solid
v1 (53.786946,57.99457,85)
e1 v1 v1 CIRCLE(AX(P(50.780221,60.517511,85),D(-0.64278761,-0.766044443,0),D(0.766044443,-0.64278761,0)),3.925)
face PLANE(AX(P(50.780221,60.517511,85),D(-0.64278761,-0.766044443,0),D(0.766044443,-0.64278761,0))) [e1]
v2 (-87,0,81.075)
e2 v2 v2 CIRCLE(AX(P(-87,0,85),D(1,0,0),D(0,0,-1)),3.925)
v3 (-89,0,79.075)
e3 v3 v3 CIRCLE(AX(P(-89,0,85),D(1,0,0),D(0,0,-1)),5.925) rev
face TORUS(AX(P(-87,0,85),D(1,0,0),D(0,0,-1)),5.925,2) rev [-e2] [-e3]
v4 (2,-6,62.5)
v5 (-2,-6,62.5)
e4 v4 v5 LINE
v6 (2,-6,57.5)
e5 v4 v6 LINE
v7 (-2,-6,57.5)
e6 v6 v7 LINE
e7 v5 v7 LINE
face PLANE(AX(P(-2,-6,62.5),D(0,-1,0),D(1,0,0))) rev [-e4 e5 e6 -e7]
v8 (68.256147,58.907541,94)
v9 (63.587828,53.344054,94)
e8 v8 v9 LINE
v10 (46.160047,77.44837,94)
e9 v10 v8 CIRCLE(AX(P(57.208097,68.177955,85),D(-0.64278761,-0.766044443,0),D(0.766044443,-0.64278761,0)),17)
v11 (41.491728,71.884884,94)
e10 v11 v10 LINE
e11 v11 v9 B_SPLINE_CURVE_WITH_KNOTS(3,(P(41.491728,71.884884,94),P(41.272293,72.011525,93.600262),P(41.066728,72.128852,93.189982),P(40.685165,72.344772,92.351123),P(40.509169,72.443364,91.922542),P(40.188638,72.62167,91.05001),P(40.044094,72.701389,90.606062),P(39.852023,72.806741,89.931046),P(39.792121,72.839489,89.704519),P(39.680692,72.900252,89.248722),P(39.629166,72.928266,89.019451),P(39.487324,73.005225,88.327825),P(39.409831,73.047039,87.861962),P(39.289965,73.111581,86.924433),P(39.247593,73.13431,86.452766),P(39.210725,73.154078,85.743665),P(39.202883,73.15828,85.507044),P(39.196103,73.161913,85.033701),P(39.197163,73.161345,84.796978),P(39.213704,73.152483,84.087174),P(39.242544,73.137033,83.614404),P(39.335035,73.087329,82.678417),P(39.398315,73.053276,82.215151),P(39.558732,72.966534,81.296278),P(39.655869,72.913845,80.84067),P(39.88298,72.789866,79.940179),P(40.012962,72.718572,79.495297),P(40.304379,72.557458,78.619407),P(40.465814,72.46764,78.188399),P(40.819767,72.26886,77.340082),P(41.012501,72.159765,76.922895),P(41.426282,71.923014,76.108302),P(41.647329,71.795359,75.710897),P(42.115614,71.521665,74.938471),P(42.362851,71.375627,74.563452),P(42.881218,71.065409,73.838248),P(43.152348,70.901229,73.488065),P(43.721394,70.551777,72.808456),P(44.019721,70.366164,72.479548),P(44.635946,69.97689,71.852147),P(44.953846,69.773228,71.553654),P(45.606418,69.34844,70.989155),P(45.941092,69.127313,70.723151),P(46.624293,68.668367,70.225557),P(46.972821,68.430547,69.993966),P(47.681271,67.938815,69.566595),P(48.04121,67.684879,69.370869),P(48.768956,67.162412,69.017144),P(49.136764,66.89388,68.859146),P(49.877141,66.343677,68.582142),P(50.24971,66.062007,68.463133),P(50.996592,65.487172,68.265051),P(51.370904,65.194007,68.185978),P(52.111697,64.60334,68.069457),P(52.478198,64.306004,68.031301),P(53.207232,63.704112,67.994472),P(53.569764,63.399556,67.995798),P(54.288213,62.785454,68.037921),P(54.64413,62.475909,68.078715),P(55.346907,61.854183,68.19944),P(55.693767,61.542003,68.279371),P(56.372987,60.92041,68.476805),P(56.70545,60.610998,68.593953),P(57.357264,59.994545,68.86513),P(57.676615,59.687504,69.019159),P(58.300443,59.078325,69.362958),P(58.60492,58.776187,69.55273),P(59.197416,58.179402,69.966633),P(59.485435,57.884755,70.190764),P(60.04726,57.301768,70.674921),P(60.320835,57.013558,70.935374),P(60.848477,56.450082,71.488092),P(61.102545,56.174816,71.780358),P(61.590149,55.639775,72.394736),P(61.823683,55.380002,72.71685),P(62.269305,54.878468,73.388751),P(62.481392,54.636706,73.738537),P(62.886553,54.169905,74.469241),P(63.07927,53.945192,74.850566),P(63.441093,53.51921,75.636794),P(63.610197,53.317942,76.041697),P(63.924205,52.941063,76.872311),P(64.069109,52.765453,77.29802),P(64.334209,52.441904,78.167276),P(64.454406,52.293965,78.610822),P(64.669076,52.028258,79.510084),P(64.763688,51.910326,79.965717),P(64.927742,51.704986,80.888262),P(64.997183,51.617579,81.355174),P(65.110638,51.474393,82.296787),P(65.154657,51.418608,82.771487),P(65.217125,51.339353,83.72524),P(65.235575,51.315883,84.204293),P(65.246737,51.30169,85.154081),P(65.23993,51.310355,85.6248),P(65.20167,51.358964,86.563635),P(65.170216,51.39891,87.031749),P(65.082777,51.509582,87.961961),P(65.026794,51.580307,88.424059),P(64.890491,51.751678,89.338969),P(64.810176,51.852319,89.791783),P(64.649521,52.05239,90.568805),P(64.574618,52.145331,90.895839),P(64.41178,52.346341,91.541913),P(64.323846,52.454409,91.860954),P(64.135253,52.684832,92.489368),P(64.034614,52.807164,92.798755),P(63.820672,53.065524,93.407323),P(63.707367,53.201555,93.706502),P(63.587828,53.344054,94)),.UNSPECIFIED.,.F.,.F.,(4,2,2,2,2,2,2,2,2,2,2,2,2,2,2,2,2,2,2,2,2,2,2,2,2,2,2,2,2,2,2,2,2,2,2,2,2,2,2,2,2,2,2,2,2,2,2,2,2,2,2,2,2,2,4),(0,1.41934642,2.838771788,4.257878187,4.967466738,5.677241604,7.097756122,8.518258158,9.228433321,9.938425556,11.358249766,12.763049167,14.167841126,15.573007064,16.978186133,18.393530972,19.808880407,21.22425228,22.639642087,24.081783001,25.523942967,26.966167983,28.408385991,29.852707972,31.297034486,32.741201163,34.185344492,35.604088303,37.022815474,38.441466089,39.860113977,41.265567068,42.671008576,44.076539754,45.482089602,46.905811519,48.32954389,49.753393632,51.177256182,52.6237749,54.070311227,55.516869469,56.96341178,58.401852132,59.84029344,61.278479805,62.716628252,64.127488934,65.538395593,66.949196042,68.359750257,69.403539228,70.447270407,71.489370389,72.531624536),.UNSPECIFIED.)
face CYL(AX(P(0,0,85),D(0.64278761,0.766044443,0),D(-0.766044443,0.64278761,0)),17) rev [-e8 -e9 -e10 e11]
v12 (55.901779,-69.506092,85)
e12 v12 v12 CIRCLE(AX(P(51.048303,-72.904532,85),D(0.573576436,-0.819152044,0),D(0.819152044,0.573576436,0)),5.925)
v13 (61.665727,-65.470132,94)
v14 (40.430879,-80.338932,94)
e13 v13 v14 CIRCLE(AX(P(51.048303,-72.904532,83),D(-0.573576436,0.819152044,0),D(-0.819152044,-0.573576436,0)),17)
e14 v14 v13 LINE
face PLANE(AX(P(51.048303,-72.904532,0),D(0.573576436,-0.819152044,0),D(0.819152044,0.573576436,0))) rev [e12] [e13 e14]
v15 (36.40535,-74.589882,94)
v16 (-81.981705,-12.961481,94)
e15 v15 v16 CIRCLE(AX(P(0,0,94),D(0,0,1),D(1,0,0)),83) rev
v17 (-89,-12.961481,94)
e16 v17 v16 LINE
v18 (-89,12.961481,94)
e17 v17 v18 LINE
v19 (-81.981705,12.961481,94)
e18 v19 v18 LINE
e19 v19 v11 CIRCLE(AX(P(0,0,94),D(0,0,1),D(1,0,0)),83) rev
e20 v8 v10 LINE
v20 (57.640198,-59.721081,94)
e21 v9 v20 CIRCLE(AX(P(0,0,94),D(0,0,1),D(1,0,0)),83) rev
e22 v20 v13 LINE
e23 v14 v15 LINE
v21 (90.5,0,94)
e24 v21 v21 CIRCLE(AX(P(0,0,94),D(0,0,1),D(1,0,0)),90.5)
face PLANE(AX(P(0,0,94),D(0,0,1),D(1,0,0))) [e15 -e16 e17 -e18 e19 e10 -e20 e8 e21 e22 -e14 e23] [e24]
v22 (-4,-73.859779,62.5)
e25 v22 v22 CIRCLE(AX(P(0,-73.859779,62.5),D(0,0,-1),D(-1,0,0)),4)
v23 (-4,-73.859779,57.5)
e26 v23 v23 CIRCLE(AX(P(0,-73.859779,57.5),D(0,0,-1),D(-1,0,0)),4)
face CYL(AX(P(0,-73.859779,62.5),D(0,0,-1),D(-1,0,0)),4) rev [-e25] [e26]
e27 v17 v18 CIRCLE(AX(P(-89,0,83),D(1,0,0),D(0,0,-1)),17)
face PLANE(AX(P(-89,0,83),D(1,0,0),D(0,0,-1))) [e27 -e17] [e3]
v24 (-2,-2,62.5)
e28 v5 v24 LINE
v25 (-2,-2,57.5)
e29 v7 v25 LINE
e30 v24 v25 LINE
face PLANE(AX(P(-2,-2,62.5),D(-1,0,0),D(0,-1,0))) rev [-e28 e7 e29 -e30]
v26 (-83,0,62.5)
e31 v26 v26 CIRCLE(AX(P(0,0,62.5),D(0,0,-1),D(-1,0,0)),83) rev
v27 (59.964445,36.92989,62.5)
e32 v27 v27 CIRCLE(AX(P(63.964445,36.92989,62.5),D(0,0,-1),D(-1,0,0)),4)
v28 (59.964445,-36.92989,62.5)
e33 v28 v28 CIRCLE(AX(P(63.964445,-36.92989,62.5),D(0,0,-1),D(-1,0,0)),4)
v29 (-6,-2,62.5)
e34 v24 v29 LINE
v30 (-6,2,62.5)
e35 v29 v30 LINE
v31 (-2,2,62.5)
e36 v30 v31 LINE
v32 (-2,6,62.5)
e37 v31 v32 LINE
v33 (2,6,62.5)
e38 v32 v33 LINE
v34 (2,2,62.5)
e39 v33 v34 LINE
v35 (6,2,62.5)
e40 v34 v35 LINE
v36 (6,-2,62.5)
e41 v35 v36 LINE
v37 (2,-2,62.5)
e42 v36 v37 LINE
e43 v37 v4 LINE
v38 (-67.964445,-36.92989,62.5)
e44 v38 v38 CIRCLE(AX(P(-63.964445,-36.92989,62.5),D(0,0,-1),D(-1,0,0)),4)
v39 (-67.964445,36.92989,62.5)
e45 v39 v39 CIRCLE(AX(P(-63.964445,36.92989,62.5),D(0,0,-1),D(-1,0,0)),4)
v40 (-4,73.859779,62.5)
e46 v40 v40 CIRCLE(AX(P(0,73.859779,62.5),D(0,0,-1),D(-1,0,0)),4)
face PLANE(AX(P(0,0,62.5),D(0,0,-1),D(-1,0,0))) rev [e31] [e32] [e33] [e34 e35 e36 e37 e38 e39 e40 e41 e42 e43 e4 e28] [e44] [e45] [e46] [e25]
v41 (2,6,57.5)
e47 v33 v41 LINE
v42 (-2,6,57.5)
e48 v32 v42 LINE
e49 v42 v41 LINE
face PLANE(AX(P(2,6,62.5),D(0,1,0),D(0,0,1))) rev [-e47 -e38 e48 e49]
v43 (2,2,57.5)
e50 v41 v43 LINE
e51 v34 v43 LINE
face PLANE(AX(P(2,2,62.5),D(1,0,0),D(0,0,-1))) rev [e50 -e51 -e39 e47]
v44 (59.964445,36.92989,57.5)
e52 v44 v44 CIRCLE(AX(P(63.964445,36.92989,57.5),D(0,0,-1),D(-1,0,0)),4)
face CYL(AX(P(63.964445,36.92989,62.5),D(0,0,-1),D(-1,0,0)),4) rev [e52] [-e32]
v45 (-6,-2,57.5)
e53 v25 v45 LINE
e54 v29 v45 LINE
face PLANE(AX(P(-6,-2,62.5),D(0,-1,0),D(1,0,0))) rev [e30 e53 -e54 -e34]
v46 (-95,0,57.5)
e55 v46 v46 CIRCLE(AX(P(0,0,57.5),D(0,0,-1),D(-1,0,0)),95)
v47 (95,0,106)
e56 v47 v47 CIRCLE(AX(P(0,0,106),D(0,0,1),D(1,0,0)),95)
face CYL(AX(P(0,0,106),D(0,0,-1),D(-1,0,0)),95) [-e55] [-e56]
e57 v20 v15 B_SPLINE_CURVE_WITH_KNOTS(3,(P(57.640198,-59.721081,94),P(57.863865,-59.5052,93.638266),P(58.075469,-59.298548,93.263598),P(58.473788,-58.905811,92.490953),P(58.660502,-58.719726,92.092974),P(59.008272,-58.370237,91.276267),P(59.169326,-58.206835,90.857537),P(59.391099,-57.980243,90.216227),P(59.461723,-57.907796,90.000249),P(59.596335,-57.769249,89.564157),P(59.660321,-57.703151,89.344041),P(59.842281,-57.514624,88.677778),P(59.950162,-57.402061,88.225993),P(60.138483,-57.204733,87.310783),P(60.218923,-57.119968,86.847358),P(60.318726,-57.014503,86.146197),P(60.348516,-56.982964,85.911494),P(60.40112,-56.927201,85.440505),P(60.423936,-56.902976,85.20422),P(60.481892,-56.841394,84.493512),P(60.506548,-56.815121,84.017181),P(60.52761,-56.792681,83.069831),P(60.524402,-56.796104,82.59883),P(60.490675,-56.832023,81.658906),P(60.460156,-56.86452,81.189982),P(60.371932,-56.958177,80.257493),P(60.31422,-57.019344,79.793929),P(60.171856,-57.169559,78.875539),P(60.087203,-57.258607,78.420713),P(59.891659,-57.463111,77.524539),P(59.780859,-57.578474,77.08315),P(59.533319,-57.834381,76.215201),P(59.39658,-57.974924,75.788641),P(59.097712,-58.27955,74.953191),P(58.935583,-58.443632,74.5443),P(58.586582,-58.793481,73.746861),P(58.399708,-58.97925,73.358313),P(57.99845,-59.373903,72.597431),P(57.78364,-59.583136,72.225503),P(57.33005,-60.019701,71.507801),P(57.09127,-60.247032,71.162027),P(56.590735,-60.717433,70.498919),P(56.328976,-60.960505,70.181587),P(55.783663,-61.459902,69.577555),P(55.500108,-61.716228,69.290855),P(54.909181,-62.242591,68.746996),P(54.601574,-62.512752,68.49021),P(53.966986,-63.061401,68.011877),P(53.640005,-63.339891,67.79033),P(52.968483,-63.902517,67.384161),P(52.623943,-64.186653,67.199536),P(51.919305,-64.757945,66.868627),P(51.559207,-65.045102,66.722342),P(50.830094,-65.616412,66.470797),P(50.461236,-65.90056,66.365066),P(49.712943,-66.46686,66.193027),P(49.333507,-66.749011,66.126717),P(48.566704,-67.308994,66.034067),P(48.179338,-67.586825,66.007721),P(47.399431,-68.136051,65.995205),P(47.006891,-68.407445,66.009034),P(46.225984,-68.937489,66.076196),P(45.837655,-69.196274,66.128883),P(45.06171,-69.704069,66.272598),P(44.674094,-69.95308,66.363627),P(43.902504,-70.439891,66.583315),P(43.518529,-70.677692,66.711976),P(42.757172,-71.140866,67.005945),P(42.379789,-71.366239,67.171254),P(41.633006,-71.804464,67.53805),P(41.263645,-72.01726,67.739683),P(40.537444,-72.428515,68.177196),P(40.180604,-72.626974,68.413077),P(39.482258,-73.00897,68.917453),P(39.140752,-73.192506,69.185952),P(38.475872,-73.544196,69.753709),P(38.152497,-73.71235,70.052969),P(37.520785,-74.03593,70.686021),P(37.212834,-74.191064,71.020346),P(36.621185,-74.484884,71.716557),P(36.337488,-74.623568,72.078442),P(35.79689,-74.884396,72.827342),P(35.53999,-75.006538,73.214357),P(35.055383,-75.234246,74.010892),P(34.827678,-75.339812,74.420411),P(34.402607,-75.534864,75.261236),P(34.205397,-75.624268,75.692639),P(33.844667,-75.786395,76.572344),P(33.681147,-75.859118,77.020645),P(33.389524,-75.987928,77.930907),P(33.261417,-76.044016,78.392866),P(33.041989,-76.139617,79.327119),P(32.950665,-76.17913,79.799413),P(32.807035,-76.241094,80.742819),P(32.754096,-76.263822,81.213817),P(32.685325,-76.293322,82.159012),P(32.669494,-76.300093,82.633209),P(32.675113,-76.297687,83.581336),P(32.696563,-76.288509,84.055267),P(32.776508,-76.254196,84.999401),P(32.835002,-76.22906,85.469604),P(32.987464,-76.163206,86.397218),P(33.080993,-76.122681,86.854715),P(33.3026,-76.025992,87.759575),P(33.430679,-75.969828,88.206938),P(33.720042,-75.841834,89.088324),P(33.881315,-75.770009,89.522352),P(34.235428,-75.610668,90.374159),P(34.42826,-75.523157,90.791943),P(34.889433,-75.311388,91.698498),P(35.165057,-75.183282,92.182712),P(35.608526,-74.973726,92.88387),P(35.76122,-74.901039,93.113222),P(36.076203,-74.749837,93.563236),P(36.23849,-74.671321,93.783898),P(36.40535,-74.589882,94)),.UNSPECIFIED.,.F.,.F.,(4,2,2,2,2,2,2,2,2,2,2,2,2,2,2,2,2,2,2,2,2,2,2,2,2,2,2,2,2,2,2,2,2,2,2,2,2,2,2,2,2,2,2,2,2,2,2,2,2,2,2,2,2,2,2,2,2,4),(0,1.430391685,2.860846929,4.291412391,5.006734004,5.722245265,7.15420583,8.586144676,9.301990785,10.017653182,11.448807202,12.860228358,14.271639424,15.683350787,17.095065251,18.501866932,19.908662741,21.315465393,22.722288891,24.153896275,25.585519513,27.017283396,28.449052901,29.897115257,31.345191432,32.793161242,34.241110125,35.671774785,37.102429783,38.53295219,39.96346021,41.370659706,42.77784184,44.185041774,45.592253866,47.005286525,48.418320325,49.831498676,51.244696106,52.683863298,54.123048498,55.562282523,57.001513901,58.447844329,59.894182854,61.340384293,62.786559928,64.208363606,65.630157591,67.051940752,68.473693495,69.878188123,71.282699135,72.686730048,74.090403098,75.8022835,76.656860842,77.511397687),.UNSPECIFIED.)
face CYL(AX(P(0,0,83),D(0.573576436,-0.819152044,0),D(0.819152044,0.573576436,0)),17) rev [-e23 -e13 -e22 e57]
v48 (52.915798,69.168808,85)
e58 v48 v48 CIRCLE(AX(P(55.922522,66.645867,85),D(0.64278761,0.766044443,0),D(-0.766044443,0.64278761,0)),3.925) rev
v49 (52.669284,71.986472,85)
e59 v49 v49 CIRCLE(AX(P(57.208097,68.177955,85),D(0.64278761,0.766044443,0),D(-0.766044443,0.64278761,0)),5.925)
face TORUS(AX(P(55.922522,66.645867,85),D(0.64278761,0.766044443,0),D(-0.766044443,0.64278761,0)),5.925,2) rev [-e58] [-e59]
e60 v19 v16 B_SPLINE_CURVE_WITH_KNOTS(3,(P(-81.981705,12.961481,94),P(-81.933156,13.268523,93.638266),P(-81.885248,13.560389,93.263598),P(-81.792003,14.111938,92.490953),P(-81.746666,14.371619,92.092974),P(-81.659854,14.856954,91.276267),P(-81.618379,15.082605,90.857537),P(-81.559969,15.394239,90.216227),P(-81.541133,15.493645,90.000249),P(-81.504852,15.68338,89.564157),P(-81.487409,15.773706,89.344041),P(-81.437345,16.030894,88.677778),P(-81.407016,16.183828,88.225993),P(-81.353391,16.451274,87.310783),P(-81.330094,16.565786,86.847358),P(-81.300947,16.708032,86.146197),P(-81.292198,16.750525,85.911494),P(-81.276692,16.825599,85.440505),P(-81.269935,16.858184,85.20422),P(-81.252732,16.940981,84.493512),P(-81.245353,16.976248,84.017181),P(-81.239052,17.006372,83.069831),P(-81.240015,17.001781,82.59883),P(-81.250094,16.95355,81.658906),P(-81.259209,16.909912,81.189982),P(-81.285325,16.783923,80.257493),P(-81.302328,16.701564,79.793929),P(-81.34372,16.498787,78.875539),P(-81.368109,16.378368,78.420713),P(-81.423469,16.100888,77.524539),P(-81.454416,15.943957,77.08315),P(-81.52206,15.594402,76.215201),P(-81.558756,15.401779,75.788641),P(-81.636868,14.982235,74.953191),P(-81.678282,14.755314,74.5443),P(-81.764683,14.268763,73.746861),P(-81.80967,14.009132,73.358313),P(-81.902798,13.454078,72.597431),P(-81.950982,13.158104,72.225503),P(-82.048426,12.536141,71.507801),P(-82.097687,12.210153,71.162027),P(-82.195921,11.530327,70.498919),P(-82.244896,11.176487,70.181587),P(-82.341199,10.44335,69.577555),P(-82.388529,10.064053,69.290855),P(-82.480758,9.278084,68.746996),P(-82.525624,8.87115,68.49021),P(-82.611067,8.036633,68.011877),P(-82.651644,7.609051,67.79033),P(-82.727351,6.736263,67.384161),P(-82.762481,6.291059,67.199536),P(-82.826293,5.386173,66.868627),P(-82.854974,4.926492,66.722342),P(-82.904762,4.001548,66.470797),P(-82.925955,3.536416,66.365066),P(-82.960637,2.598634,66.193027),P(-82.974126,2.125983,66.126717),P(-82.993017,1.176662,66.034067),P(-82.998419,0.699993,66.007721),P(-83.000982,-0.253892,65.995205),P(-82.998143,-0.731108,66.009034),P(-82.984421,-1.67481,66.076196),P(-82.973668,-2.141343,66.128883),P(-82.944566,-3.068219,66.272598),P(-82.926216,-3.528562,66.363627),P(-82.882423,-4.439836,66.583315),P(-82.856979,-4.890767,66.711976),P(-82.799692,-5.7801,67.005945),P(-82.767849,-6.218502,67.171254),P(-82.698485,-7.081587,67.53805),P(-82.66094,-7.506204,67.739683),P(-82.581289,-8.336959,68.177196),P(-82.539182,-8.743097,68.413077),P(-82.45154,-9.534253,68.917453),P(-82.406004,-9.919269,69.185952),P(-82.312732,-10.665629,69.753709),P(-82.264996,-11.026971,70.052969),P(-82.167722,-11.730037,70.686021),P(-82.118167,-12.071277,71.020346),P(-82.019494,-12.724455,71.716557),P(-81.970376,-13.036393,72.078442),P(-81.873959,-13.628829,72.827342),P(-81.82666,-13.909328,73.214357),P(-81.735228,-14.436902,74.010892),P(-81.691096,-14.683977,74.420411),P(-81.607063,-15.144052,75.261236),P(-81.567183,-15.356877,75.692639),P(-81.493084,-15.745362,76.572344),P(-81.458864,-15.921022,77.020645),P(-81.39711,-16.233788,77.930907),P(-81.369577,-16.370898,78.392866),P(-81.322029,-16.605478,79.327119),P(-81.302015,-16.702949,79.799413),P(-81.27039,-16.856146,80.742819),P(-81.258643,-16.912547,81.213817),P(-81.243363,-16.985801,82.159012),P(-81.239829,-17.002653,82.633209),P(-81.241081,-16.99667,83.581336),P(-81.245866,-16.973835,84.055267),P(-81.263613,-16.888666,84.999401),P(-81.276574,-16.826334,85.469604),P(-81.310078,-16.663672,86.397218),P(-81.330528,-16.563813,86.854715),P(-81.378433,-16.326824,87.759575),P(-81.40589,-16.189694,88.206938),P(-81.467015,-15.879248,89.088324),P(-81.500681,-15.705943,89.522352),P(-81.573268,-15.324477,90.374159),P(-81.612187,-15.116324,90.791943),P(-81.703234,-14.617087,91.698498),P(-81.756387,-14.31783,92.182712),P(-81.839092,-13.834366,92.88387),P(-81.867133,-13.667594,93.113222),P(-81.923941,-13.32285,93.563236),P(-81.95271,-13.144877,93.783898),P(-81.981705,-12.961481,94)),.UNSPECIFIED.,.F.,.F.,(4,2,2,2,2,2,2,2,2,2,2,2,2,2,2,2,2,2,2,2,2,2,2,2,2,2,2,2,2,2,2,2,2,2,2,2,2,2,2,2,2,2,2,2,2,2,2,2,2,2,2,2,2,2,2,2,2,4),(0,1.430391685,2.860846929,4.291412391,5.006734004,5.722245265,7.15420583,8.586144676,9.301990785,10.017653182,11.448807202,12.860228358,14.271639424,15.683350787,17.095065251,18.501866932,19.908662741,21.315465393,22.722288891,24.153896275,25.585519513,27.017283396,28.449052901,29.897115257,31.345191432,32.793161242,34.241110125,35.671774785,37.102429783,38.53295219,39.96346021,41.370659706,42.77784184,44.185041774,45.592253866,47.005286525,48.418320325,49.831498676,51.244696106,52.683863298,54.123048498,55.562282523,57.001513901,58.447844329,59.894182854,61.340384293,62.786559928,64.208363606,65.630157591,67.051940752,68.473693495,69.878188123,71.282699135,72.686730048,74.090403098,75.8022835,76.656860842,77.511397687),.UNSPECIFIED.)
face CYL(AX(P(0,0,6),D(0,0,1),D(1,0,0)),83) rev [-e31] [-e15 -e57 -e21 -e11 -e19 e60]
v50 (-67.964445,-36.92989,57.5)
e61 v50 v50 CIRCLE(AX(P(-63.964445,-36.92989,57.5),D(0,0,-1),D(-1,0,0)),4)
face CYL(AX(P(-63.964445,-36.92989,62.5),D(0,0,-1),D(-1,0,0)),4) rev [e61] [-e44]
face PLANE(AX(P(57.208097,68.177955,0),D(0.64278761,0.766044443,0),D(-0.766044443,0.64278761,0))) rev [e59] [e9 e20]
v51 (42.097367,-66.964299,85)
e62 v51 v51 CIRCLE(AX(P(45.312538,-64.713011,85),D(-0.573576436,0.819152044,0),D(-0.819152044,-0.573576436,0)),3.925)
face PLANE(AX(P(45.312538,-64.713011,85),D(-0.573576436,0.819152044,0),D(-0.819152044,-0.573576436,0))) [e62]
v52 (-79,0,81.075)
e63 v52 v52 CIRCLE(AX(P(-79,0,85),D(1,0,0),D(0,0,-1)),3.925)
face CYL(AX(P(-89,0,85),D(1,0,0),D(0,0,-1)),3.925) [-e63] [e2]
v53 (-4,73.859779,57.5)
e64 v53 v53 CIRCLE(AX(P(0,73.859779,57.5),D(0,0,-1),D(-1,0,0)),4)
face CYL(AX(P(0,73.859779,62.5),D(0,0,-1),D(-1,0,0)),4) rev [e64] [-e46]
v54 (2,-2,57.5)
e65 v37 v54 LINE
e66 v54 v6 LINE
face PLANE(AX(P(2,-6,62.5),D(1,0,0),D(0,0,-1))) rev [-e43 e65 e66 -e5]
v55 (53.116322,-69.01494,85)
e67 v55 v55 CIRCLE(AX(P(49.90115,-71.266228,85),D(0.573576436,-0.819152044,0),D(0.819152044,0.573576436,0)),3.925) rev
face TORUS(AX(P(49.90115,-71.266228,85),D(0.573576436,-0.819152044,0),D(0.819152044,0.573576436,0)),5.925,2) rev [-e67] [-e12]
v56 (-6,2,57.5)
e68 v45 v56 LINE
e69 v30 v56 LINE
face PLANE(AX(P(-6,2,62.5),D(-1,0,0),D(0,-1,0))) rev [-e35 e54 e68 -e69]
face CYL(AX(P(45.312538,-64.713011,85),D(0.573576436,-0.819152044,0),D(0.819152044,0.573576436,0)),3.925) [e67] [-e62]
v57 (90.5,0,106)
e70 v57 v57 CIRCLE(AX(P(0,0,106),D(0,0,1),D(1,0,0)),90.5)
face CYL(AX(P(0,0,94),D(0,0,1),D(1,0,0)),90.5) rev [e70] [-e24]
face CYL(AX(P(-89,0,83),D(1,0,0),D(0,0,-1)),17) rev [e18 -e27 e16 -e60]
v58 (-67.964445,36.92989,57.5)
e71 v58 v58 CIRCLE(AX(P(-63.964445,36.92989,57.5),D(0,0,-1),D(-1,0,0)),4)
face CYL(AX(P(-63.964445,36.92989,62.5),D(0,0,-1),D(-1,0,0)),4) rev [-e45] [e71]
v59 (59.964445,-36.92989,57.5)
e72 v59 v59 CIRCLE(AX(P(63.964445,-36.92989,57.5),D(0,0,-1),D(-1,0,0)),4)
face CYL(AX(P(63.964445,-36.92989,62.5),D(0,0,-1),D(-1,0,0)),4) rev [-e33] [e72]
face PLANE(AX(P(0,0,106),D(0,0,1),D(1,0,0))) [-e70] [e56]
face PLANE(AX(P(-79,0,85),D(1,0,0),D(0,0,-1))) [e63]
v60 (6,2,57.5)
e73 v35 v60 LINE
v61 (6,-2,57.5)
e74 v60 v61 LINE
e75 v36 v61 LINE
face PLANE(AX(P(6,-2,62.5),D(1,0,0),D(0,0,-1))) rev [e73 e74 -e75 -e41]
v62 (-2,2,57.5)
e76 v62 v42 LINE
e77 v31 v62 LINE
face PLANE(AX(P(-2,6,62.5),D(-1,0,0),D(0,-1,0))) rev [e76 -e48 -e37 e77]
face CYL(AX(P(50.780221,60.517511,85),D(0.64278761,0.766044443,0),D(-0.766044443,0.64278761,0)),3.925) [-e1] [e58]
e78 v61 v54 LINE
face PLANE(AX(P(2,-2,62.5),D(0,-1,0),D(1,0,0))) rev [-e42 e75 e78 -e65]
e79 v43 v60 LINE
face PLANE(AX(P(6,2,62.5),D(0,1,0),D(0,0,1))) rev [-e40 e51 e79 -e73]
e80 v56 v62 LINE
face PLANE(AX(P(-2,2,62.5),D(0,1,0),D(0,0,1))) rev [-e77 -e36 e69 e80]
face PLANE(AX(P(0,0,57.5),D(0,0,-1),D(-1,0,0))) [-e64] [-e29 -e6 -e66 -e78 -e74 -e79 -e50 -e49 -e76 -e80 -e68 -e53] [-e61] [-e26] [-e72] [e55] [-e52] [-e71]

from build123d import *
from build123d.topology import SkipClean

# Parameters (mm, degrees)
CROQUIS1_R                   = 95
SALIENTE_EXTRUIR1_DEPTH      = 106
CROQUIS2_R                   = 83
CORTAR_EXTRUIR1_DEPTH        = 100
CROQUIS3_R                   = 90.5
CORTAR_EXTRUIR2_DEPTH        = 12
CROQUIS4_R                   = 17
CORTAR_EXTRUIR4_DEPTH        = 89
SALIENTE_EXTRUIR2_DEPTH      = 0.001
SALIENTE_EXTRUIR2_DEPTH_BACK = 89
CROQUIS5_R                   = 3.925
CORTAR_EXTRUIR5_DEPTH        = 79
CORTAR_EXTRUIR5_DEPTH_BACK   = 79
CROQUIS6_R                   = 3.925
CORTAR_EXTRUIR6_START        = 81.240384105
CORTAR_EXTRUIR6_DEPTH        = 7.759615895
CROQUIS7_R                   = 3.925
SALIENTE_EXTRUIR3_DEPTH      = 10
CORTAR_EXTRUIR10_START       = 81.240383801
CORTAR_EXTRUIR10_DEPTH       = 7.759616199
CROQUIS8_R                   = 3.925
SALIENTE_EXTRUIR4_DEPTH      = 10
REDONDEO2_R                  = 2
CORTAR_EXTRUIR11_DEPTH       = 21
CROQUIS13_R                  = 2.5
CORTAR_EXTRUIR12_DEPTH       = 10
CROQUIS14_R                  = 95
CORTAR_EXTRUIR13_DEPTH       = 60
CROQUIS15_R                  = 95
SALIENTE_EXTRUIR5_DEPTH      = 2.5
CORTAR_EXTRUIR14_DEPTH       = 5
CROQUIS17_R                  = 4
CORTAR_EXTRUIR16_DEPTH       = 5


# Read off the part's stored shape, not the designer's step: Cortar-Extruir6, Cortar-Extruir10
with BuildPart() as part:
    # Croquis1 → Saliente-Extruir1 (new body)
    with BuildSketch(Plane.XY):
        Circle(CROQUIS1_R)
    extrude(amount=SALIENTE_EXTRUIR1_DEPTH)

    # Croquis2 → Cortar-Extruir1 (cut)
    with BuildSketch(Plane.XY.offset(106)):
        Circle(CROQUIS2_R)
    extrude(amount=-CORTAR_EXTRUIR1_DEPTH, mode=Mode.SUBTRACT)

    # Croquis3 → Cortar-Extruir2 (cut)
    with BuildSketch(Plane.XY.offset(106)):
        Circle(CROQUIS3_R)
    extrude(amount=-CORTAR_EXTRUIR2_DEPTH, mode=Mode.SUBTRACT)

    # Croquis4 → Cortar-Extruir4 (cut)
    with BuildSketch(Plane(origin=(0, 0, 0), x_dir=(0, 0, -1), z_dir=(1, 0, 0))):
        with Locations((-83, 0)):
            Circle(CROQUIS4_R)
    extrude(amount=-CORTAR_EXTRUIR4_DEPTH, mode=Mode.SUBTRACT)

    # Croquis5 → Saliente-Extruir2 (add, two sides: drawn at the far end of the back side and taken through both)
    with BuildSketch(Plane(origin=(0, 0, 0), x_dir=(0, 0, -1), z_dir=(1, 0, 0)).offset(-SALIENTE_EXTRUIR2_DEPTH_BACK)):
        with Locations((-85, 0)):
            Circle(CROQUIS5_R)
    extrude(amount=SALIENTE_EXTRUIR2_DEPTH + SALIENTE_EXTRUIR2_DEPTH_BACK)

    # Croquis6 → Cortar-Extruir5 (cut, two sides: drawn at the far end of the back side and taken through both)
    with BuildSketch(Plane(origin=(0, 0, 0), x_dir=(0, 0, -1), z_dir=(1, 0, 0)).offset(-CORTAR_EXTRUIR5_DEPTH_BACK)):
        with Locations((-85, 0)):
            Circle(CROQUIS6_R)
    extrude(amount=CORTAR_EXTRUIR5_DEPTH + CORTAR_EXTRUIR5_DEPTH_BACK, mode=Mode.SUBTRACT)

    # Cortar-Extruir6 outline → Cortar-Extruir6 (cut)
    with BuildSketch(Plane(origin=(0, 0, 0), x_dir=(0.8191520442889906, 0.5735764363510478, 0), z_dir=(0.5735764363510478, -0.8191520442889907, 0)).offset(CORTAR_EXTRUIR6_START)):
        with BuildLine():
            Line((12.961481397, 94), (-12.961481397, 94))
            ThreePointArc((-12.961481397, 94), (0, 66), (12.961481397, 94))
        make_face()
    extrude(amount=CORTAR_EXTRUIR6_DEPTH, mode=Mode.SUBTRACT)

    # Croquis7 → Saliente-Extruir3 (add)
    with BuildSketch(Plane(origin=(51.048302836, -72.904531941, 0), x_dir=(0.8191520442843079, 0.5735764363577354, 2.1722123141071213e-13), z_dir=(-0.5735764363577354, 0.8191520442843079, 3.1022406865588427e-13))):
        with Locations((0, -85)):
            Circle(CROQUIS7_R)
    extrude(amount=SALIENTE_EXTRUIR3_DEPTH)

    # Cortar-Extruir10 outline → Cortar-Extruir10 (cut)
    with BuildSketch(Plane(origin=(0, 0, 0), x_dir=(0.7660444431189818, -0.642787609686535, 0), z_dir=(0.6427876096865349, 0.7660444431189818, 0)).offset(CORTAR_EXTRUIR10_START)):
        with BuildLine():
            Line((-14.422205102, -94), (14.422205102, -94))
            ThreePointArc((14.422205102, -94), (0, -68), (-14.422205102, -94))
        make_face()
    extrude(amount=CORTAR_EXTRUIR10_DEPTH, mode=Mode.SUBTRACT)

    # Croquis8 → Saliente-Extruir4 (add)
    with BuildSketch(Plane(origin=(57.208097263, 68.177955437, 0), x_dir=(0.7660444431126934, -0.642787609694029, -3.1196544125319357e-13), z_dir=(-0.642787609694029, -0.7660444431126934, -3.717859353713491e-13))):
        with Locations(Location((0, 85, 0), (0, 0, 180))):
            Circle(CROQUIS8_R)
    extrude(amount=SALIENTE_EXTRUIR4_DEPTH)

    # Redondeo2
    redondeo2_edges = [part.edges().sort_by_distance(p)[0] for p in [
        (-89, 0, 88.925),
        (47.833131062, -75.155819454, 85),
        (60.214821702, 65.655014069, 85),
    ]]
    fillet(redondeo2_edges, radius=REDONDEO2_R)

    # Croquis12 → Cortar-Extruir11 (cut)
    with BuildSketch(Plane.XY.offset(6)):
        Polygon((-2, 6), (2, 6), (2, 2), (6, 2), (6, -2), (2, -2), (2, -6), (-2, -6), (-2, -2), (-6, -2), (-6, 2), (-2, 2), align=None)
    extrude(amount=-CORTAR_EXTRUIR11_DEPTH, mode=Mode.SUBTRACT)

    # Croquis13 → Cortar-Extruir12 (cut)
    with BuildSketch(Plane.XY.offset(6)):
        with Locations((0, 77.833820013)):
            Circle(CROQUIS13_R)
        with Locations((77.833820013, 0)):
            Circle(CROQUIS13_R)
        with Locations((0, -77.833820013)):
            Circle(CROQUIS13_R)
        with Locations((-77.833820013, 0)):
            Circle(CROQUIS13_R)
    extrude(amount=-CORTAR_EXTRUIR12_DEPTH, mode=Mode.SUBTRACT)

    # Croquis14 → Cortar-Extruir13 (cut)
    with BuildSketch(Plane(origin=(0, 0, 0), x_dir=(-1, 0, 0), z_dir=(0, 0, -1))):
        Circle(CROQUIS14_R)
    extrude(amount=-CORTAR_EXTRUIR13_DEPTH, mode=Mode.SUBTRACT)

    # Croquis15 → Saliente-Extruir5 (add, symmetric)
    with SkipClean():  # the faces are left unmerged after this step: merging them gives an invalid solid
        with BuildSketch(Plane(origin=(0, 0, 60), x_dir=(-1, 0, 0), z_dir=(0, 0, -1))):
            Circle(CROQUIS15_R)
        extrude(amount=SALIENTE_EXTRUIR5_DEPTH, both=True)
    add(part.part.scale(1), mode=Mode.REPLACE)  # the faces are merged on a copy

    # Croquis16 → Cortar-Extruir14 (cut)
    with BuildSketch(Plane(origin=(0, 0, 57.5), x_dir=(-1, 0, 0), z_dir=(0, 0, -1))):
        Polygon((-2, 6), (2, 6), (2, 2), (6, 2), (6, -2), (2, -2), (2, -6), (-2, -6), (-2, -2), (-6, -2), (-6, 2), (-2, 2), align=None)
    extrude(amount=-CORTAR_EXTRUIR14_DEPTH, mode=Mode.SUBTRACT)

    # Croquis17 → Cortar-Extruir16 (cut)
    with BuildSketch(Plane(origin=(0, 0, 57.5), x_dir=(-1, 0, 0), z_dir=(0, 0, -1))):
        with Locations((0, 73.859779167)):
            Circle(CROQUIS17_R)
        with Locations((63.964445077, 36.929889584)):
            Circle(CROQUIS17_R)
        with Locations((63.964445077, -36.929889584)):
            Circle(CROQUIS17_R)
        with Locations((0, -73.859779167)):
            Circle(CROQUIS17_R)
        with Locations((-63.964445077, -36.929889584)):
            Circle(CROQUIS17_R)
        with Locations((-63.964445077, 36.929889584)):
            Circle(CROQUIS17_R)
    extrude(amount=-CORTAR_EXTRUIR16_DEPTH, mode=Mode.SUBTRACT)


solid = part.part
